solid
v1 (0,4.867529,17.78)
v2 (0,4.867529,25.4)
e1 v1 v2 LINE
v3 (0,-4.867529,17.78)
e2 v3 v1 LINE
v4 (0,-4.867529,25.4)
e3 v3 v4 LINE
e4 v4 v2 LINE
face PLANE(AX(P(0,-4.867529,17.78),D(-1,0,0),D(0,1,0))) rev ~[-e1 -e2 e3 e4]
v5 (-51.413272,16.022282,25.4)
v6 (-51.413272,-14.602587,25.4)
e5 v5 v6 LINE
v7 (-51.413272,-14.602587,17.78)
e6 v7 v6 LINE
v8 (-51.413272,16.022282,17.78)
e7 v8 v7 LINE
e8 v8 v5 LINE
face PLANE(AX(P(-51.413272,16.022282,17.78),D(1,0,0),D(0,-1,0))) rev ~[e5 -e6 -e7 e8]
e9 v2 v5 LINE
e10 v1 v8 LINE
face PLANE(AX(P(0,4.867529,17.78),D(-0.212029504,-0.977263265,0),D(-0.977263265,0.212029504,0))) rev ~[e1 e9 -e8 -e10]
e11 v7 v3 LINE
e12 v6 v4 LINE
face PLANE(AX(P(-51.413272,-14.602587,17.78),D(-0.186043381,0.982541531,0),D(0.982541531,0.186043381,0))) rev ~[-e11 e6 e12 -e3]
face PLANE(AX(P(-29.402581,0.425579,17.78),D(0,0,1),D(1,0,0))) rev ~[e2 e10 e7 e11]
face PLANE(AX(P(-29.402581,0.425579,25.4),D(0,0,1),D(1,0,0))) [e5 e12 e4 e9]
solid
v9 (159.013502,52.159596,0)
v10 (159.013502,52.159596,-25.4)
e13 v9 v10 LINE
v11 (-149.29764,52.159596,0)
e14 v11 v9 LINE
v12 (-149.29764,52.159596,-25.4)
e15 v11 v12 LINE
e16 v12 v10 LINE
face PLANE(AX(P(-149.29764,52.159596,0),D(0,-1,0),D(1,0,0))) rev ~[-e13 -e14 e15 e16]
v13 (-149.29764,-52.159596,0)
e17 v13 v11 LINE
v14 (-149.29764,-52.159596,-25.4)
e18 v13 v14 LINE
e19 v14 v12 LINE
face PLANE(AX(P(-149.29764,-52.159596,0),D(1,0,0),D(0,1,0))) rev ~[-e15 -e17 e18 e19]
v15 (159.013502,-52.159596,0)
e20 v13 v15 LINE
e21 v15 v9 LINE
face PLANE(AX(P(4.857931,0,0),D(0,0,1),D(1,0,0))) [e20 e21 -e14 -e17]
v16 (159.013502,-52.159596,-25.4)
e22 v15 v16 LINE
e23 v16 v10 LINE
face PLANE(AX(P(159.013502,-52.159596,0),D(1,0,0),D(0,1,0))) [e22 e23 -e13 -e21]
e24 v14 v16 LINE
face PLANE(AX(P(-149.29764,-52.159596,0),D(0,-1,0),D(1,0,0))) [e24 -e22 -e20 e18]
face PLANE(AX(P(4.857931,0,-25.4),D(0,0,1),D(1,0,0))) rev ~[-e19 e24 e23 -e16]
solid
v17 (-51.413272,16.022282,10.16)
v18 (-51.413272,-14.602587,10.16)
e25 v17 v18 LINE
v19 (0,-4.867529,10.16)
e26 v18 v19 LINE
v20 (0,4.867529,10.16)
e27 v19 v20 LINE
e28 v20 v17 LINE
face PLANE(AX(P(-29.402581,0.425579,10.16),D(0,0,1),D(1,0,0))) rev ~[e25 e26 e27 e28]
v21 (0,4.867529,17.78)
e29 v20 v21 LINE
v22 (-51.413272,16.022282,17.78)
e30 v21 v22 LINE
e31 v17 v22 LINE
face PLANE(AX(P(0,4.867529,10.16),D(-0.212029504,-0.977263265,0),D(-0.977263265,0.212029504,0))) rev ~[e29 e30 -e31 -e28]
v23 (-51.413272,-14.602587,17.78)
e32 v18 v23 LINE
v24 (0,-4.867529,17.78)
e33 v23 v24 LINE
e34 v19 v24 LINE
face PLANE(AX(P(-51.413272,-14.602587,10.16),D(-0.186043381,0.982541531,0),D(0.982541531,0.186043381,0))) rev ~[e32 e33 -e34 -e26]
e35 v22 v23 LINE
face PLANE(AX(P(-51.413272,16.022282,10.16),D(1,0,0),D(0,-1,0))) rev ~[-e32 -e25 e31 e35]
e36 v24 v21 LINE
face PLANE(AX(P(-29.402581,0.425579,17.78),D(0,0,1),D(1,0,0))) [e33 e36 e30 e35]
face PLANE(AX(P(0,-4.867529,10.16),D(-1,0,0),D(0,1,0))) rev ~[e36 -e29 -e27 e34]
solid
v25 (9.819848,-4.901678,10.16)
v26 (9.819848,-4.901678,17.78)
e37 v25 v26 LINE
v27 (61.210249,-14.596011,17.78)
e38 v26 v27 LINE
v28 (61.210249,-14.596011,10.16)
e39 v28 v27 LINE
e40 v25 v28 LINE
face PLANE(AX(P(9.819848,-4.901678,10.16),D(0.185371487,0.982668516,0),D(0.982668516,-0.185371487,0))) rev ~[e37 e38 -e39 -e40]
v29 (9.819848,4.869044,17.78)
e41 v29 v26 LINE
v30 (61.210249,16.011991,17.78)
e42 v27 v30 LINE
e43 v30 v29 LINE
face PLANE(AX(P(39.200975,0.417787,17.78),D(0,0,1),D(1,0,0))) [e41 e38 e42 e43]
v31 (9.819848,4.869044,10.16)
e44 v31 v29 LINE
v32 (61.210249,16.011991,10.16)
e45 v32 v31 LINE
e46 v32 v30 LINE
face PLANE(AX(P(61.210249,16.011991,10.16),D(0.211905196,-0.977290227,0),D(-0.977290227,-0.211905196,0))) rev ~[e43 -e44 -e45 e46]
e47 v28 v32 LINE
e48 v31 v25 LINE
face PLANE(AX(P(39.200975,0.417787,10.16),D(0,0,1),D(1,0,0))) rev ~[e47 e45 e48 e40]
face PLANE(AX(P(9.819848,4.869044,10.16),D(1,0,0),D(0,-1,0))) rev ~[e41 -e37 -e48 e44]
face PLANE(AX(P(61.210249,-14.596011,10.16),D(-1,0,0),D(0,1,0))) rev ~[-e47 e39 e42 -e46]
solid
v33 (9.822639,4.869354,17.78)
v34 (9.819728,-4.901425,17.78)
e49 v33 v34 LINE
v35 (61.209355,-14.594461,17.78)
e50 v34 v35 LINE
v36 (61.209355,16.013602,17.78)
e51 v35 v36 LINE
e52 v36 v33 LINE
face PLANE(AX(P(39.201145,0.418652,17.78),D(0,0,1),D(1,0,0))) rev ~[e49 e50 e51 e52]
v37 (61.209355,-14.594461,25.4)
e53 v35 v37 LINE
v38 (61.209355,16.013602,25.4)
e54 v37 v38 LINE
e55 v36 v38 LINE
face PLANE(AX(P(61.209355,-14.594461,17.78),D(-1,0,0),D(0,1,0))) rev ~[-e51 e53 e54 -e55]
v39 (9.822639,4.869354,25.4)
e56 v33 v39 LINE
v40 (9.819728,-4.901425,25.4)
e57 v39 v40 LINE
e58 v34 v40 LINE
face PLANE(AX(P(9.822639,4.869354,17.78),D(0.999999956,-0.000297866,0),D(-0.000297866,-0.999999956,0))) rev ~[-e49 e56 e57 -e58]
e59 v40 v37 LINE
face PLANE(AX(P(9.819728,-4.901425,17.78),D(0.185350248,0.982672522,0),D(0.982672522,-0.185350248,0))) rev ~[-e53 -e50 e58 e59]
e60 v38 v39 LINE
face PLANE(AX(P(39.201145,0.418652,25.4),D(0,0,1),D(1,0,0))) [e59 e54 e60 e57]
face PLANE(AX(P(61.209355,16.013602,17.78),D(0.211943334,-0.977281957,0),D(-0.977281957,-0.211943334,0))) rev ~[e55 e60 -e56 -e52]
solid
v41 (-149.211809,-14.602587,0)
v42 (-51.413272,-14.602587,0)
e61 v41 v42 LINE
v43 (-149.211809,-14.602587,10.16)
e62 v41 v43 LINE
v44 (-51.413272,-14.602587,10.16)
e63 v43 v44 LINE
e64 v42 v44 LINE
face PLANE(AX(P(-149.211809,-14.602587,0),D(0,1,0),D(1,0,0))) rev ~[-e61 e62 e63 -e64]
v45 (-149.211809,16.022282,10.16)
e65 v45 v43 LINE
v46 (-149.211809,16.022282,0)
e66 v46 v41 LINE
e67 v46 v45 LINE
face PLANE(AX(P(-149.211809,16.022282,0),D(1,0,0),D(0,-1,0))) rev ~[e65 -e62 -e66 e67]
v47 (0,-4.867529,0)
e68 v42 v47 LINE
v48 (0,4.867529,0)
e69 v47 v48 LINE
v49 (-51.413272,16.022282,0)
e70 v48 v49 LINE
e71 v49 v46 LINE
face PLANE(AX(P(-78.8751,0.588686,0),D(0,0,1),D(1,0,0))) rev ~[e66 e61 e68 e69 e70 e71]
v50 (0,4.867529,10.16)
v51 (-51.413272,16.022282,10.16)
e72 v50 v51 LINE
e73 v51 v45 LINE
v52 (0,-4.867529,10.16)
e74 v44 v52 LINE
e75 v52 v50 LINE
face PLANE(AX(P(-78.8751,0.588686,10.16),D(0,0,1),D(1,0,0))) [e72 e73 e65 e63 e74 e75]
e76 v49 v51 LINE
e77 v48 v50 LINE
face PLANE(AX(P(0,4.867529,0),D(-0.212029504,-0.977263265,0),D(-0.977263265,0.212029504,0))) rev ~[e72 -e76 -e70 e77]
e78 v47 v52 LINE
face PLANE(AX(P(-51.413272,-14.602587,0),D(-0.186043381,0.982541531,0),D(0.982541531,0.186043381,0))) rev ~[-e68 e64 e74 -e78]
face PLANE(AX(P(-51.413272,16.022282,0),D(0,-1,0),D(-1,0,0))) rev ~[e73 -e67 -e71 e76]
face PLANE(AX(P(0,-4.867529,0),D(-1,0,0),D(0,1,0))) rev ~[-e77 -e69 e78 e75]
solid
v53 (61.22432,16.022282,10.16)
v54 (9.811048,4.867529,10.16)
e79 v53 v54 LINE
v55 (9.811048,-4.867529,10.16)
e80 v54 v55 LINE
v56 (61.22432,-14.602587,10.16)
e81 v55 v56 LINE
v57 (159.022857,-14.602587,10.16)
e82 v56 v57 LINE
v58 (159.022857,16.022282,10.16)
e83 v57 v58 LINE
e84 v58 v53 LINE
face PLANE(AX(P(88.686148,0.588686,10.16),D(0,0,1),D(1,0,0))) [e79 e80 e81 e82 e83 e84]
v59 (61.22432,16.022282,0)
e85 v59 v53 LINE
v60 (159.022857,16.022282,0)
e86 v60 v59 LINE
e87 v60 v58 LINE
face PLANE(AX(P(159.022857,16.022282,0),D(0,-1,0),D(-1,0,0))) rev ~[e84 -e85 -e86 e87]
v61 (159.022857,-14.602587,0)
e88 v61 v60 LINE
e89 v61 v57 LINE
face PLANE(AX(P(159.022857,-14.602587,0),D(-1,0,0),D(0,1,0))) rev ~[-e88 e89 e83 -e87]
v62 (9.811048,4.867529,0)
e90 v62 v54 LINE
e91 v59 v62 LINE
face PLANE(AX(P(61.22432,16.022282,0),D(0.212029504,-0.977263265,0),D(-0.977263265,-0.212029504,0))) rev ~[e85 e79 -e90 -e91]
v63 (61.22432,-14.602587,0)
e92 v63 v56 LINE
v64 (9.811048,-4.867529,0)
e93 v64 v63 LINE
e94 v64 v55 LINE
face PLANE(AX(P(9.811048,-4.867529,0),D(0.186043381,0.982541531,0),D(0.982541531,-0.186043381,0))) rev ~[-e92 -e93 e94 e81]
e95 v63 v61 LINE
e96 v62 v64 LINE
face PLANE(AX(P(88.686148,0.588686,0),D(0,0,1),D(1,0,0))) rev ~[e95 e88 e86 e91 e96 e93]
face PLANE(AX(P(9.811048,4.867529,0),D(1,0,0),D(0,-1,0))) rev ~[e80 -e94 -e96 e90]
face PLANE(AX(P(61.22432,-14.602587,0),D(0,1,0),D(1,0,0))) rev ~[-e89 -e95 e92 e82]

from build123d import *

# Parameters (mm, degrees)
F0_W     = 308.3111420274
F0_H     = 104.3191924691
F1_DEPTH = 25.4
F3_DEPTH = 10.16
F5_DEPTH = 7.62
F7_DEPTH = 7.62


# Not quite as in the source:
# - a feature names something its author has since deleted; it is built from what else it names


with BuildPart() as f1:
    # F0 (on Top) → F1 (new body)
    with BuildSketch(Plane.XY):
        with Locations((4.8579312861, 0)):
            Rectangle(F0_W, F0_H)
    extrude(amount=-F1_DEPTH)


with BuildPart() as f3:
    # F2 (on face) → F3 (new body)
    with BuildSketch(Plane.XY):
        Polygon((0, 4.8675285652), (-51.4132715762, 16.0222817212), (-149.2118090391, 16.0222817212), (-149.2118090391, -14.602586627), (-51.4132715762, -14.602586627), (0, -4.8675285652), align=None)
    extrude(amount=F3_DEPTH)


with BuildPart() as f3b:
    # F2 (on face) → F3, piece 2 (new body)
    with BuildSketch(Plane.XY):
        Polygon((159.022857435, 16.0222817212), (61.2243199721, 16.0222817212), (9.8110483959, 4.8675285652), (9.8110483959, -4.8675285652), (61.2243199721, -14.602586627), (159.022857435, -14.602586627), align=None)
    extrude(amount=F3_DEPTH)


with BuildPart() as f5:
    # F4 (on face) → F5 (new body)
    with BuildSketch(Plane.XY.offset(10.16)):
        Polygon((0, 4.8675285652), (-51.4132715762, 16.0222817212), (-51.4132715762, -14.602586627), (0, -4.8675285652), align=None)
    extrude(amount=F5_DEPTH)


with BuildPart() as f5b:
    # F4 (on face) → F5, piece 2 (new body)
    with BuildSketch(Plane.XY.offset(10.16)):
        Polygon((61.2102486193, 16.0119906068), (9.8198475316, 4.8690438271), (9.8198475316, -4.9016783014), (61.2102486193, -14.5960105583), align=None)
    extrude(amount=F5_DEPTH)


with BuildPart() as f7:
    # F6 (on face) → F7 (new body)
    with BuildSketch(Plane.XY.offset(17.78)):
        Polygon((0, 4.8675285652), (-51.4132715762, 16.0222817212), (-51.4132715762, -14.602586627), (0, -4.8675285652), align=None)
    extrude(amount=F7_DEPTH)


with BuildPart() as f7b:
    # F6 (on face) → F7, piece 2 (new body)
    with BuildSketch(Plane.XY.offset(17.78)):
        Polygon((61.2093545496, 16.0136017948), (9.8226387054, 4.8693544231), (9.8197283223, -4.9014249817), (61.2093545496, -14.5944608375), align=None)
    extrude(amount=F7_DEPTH)


solid = Compound([f1.part, f3.part, f3b.part, f5.part, f5b.part, f7.part, f7b.part])
